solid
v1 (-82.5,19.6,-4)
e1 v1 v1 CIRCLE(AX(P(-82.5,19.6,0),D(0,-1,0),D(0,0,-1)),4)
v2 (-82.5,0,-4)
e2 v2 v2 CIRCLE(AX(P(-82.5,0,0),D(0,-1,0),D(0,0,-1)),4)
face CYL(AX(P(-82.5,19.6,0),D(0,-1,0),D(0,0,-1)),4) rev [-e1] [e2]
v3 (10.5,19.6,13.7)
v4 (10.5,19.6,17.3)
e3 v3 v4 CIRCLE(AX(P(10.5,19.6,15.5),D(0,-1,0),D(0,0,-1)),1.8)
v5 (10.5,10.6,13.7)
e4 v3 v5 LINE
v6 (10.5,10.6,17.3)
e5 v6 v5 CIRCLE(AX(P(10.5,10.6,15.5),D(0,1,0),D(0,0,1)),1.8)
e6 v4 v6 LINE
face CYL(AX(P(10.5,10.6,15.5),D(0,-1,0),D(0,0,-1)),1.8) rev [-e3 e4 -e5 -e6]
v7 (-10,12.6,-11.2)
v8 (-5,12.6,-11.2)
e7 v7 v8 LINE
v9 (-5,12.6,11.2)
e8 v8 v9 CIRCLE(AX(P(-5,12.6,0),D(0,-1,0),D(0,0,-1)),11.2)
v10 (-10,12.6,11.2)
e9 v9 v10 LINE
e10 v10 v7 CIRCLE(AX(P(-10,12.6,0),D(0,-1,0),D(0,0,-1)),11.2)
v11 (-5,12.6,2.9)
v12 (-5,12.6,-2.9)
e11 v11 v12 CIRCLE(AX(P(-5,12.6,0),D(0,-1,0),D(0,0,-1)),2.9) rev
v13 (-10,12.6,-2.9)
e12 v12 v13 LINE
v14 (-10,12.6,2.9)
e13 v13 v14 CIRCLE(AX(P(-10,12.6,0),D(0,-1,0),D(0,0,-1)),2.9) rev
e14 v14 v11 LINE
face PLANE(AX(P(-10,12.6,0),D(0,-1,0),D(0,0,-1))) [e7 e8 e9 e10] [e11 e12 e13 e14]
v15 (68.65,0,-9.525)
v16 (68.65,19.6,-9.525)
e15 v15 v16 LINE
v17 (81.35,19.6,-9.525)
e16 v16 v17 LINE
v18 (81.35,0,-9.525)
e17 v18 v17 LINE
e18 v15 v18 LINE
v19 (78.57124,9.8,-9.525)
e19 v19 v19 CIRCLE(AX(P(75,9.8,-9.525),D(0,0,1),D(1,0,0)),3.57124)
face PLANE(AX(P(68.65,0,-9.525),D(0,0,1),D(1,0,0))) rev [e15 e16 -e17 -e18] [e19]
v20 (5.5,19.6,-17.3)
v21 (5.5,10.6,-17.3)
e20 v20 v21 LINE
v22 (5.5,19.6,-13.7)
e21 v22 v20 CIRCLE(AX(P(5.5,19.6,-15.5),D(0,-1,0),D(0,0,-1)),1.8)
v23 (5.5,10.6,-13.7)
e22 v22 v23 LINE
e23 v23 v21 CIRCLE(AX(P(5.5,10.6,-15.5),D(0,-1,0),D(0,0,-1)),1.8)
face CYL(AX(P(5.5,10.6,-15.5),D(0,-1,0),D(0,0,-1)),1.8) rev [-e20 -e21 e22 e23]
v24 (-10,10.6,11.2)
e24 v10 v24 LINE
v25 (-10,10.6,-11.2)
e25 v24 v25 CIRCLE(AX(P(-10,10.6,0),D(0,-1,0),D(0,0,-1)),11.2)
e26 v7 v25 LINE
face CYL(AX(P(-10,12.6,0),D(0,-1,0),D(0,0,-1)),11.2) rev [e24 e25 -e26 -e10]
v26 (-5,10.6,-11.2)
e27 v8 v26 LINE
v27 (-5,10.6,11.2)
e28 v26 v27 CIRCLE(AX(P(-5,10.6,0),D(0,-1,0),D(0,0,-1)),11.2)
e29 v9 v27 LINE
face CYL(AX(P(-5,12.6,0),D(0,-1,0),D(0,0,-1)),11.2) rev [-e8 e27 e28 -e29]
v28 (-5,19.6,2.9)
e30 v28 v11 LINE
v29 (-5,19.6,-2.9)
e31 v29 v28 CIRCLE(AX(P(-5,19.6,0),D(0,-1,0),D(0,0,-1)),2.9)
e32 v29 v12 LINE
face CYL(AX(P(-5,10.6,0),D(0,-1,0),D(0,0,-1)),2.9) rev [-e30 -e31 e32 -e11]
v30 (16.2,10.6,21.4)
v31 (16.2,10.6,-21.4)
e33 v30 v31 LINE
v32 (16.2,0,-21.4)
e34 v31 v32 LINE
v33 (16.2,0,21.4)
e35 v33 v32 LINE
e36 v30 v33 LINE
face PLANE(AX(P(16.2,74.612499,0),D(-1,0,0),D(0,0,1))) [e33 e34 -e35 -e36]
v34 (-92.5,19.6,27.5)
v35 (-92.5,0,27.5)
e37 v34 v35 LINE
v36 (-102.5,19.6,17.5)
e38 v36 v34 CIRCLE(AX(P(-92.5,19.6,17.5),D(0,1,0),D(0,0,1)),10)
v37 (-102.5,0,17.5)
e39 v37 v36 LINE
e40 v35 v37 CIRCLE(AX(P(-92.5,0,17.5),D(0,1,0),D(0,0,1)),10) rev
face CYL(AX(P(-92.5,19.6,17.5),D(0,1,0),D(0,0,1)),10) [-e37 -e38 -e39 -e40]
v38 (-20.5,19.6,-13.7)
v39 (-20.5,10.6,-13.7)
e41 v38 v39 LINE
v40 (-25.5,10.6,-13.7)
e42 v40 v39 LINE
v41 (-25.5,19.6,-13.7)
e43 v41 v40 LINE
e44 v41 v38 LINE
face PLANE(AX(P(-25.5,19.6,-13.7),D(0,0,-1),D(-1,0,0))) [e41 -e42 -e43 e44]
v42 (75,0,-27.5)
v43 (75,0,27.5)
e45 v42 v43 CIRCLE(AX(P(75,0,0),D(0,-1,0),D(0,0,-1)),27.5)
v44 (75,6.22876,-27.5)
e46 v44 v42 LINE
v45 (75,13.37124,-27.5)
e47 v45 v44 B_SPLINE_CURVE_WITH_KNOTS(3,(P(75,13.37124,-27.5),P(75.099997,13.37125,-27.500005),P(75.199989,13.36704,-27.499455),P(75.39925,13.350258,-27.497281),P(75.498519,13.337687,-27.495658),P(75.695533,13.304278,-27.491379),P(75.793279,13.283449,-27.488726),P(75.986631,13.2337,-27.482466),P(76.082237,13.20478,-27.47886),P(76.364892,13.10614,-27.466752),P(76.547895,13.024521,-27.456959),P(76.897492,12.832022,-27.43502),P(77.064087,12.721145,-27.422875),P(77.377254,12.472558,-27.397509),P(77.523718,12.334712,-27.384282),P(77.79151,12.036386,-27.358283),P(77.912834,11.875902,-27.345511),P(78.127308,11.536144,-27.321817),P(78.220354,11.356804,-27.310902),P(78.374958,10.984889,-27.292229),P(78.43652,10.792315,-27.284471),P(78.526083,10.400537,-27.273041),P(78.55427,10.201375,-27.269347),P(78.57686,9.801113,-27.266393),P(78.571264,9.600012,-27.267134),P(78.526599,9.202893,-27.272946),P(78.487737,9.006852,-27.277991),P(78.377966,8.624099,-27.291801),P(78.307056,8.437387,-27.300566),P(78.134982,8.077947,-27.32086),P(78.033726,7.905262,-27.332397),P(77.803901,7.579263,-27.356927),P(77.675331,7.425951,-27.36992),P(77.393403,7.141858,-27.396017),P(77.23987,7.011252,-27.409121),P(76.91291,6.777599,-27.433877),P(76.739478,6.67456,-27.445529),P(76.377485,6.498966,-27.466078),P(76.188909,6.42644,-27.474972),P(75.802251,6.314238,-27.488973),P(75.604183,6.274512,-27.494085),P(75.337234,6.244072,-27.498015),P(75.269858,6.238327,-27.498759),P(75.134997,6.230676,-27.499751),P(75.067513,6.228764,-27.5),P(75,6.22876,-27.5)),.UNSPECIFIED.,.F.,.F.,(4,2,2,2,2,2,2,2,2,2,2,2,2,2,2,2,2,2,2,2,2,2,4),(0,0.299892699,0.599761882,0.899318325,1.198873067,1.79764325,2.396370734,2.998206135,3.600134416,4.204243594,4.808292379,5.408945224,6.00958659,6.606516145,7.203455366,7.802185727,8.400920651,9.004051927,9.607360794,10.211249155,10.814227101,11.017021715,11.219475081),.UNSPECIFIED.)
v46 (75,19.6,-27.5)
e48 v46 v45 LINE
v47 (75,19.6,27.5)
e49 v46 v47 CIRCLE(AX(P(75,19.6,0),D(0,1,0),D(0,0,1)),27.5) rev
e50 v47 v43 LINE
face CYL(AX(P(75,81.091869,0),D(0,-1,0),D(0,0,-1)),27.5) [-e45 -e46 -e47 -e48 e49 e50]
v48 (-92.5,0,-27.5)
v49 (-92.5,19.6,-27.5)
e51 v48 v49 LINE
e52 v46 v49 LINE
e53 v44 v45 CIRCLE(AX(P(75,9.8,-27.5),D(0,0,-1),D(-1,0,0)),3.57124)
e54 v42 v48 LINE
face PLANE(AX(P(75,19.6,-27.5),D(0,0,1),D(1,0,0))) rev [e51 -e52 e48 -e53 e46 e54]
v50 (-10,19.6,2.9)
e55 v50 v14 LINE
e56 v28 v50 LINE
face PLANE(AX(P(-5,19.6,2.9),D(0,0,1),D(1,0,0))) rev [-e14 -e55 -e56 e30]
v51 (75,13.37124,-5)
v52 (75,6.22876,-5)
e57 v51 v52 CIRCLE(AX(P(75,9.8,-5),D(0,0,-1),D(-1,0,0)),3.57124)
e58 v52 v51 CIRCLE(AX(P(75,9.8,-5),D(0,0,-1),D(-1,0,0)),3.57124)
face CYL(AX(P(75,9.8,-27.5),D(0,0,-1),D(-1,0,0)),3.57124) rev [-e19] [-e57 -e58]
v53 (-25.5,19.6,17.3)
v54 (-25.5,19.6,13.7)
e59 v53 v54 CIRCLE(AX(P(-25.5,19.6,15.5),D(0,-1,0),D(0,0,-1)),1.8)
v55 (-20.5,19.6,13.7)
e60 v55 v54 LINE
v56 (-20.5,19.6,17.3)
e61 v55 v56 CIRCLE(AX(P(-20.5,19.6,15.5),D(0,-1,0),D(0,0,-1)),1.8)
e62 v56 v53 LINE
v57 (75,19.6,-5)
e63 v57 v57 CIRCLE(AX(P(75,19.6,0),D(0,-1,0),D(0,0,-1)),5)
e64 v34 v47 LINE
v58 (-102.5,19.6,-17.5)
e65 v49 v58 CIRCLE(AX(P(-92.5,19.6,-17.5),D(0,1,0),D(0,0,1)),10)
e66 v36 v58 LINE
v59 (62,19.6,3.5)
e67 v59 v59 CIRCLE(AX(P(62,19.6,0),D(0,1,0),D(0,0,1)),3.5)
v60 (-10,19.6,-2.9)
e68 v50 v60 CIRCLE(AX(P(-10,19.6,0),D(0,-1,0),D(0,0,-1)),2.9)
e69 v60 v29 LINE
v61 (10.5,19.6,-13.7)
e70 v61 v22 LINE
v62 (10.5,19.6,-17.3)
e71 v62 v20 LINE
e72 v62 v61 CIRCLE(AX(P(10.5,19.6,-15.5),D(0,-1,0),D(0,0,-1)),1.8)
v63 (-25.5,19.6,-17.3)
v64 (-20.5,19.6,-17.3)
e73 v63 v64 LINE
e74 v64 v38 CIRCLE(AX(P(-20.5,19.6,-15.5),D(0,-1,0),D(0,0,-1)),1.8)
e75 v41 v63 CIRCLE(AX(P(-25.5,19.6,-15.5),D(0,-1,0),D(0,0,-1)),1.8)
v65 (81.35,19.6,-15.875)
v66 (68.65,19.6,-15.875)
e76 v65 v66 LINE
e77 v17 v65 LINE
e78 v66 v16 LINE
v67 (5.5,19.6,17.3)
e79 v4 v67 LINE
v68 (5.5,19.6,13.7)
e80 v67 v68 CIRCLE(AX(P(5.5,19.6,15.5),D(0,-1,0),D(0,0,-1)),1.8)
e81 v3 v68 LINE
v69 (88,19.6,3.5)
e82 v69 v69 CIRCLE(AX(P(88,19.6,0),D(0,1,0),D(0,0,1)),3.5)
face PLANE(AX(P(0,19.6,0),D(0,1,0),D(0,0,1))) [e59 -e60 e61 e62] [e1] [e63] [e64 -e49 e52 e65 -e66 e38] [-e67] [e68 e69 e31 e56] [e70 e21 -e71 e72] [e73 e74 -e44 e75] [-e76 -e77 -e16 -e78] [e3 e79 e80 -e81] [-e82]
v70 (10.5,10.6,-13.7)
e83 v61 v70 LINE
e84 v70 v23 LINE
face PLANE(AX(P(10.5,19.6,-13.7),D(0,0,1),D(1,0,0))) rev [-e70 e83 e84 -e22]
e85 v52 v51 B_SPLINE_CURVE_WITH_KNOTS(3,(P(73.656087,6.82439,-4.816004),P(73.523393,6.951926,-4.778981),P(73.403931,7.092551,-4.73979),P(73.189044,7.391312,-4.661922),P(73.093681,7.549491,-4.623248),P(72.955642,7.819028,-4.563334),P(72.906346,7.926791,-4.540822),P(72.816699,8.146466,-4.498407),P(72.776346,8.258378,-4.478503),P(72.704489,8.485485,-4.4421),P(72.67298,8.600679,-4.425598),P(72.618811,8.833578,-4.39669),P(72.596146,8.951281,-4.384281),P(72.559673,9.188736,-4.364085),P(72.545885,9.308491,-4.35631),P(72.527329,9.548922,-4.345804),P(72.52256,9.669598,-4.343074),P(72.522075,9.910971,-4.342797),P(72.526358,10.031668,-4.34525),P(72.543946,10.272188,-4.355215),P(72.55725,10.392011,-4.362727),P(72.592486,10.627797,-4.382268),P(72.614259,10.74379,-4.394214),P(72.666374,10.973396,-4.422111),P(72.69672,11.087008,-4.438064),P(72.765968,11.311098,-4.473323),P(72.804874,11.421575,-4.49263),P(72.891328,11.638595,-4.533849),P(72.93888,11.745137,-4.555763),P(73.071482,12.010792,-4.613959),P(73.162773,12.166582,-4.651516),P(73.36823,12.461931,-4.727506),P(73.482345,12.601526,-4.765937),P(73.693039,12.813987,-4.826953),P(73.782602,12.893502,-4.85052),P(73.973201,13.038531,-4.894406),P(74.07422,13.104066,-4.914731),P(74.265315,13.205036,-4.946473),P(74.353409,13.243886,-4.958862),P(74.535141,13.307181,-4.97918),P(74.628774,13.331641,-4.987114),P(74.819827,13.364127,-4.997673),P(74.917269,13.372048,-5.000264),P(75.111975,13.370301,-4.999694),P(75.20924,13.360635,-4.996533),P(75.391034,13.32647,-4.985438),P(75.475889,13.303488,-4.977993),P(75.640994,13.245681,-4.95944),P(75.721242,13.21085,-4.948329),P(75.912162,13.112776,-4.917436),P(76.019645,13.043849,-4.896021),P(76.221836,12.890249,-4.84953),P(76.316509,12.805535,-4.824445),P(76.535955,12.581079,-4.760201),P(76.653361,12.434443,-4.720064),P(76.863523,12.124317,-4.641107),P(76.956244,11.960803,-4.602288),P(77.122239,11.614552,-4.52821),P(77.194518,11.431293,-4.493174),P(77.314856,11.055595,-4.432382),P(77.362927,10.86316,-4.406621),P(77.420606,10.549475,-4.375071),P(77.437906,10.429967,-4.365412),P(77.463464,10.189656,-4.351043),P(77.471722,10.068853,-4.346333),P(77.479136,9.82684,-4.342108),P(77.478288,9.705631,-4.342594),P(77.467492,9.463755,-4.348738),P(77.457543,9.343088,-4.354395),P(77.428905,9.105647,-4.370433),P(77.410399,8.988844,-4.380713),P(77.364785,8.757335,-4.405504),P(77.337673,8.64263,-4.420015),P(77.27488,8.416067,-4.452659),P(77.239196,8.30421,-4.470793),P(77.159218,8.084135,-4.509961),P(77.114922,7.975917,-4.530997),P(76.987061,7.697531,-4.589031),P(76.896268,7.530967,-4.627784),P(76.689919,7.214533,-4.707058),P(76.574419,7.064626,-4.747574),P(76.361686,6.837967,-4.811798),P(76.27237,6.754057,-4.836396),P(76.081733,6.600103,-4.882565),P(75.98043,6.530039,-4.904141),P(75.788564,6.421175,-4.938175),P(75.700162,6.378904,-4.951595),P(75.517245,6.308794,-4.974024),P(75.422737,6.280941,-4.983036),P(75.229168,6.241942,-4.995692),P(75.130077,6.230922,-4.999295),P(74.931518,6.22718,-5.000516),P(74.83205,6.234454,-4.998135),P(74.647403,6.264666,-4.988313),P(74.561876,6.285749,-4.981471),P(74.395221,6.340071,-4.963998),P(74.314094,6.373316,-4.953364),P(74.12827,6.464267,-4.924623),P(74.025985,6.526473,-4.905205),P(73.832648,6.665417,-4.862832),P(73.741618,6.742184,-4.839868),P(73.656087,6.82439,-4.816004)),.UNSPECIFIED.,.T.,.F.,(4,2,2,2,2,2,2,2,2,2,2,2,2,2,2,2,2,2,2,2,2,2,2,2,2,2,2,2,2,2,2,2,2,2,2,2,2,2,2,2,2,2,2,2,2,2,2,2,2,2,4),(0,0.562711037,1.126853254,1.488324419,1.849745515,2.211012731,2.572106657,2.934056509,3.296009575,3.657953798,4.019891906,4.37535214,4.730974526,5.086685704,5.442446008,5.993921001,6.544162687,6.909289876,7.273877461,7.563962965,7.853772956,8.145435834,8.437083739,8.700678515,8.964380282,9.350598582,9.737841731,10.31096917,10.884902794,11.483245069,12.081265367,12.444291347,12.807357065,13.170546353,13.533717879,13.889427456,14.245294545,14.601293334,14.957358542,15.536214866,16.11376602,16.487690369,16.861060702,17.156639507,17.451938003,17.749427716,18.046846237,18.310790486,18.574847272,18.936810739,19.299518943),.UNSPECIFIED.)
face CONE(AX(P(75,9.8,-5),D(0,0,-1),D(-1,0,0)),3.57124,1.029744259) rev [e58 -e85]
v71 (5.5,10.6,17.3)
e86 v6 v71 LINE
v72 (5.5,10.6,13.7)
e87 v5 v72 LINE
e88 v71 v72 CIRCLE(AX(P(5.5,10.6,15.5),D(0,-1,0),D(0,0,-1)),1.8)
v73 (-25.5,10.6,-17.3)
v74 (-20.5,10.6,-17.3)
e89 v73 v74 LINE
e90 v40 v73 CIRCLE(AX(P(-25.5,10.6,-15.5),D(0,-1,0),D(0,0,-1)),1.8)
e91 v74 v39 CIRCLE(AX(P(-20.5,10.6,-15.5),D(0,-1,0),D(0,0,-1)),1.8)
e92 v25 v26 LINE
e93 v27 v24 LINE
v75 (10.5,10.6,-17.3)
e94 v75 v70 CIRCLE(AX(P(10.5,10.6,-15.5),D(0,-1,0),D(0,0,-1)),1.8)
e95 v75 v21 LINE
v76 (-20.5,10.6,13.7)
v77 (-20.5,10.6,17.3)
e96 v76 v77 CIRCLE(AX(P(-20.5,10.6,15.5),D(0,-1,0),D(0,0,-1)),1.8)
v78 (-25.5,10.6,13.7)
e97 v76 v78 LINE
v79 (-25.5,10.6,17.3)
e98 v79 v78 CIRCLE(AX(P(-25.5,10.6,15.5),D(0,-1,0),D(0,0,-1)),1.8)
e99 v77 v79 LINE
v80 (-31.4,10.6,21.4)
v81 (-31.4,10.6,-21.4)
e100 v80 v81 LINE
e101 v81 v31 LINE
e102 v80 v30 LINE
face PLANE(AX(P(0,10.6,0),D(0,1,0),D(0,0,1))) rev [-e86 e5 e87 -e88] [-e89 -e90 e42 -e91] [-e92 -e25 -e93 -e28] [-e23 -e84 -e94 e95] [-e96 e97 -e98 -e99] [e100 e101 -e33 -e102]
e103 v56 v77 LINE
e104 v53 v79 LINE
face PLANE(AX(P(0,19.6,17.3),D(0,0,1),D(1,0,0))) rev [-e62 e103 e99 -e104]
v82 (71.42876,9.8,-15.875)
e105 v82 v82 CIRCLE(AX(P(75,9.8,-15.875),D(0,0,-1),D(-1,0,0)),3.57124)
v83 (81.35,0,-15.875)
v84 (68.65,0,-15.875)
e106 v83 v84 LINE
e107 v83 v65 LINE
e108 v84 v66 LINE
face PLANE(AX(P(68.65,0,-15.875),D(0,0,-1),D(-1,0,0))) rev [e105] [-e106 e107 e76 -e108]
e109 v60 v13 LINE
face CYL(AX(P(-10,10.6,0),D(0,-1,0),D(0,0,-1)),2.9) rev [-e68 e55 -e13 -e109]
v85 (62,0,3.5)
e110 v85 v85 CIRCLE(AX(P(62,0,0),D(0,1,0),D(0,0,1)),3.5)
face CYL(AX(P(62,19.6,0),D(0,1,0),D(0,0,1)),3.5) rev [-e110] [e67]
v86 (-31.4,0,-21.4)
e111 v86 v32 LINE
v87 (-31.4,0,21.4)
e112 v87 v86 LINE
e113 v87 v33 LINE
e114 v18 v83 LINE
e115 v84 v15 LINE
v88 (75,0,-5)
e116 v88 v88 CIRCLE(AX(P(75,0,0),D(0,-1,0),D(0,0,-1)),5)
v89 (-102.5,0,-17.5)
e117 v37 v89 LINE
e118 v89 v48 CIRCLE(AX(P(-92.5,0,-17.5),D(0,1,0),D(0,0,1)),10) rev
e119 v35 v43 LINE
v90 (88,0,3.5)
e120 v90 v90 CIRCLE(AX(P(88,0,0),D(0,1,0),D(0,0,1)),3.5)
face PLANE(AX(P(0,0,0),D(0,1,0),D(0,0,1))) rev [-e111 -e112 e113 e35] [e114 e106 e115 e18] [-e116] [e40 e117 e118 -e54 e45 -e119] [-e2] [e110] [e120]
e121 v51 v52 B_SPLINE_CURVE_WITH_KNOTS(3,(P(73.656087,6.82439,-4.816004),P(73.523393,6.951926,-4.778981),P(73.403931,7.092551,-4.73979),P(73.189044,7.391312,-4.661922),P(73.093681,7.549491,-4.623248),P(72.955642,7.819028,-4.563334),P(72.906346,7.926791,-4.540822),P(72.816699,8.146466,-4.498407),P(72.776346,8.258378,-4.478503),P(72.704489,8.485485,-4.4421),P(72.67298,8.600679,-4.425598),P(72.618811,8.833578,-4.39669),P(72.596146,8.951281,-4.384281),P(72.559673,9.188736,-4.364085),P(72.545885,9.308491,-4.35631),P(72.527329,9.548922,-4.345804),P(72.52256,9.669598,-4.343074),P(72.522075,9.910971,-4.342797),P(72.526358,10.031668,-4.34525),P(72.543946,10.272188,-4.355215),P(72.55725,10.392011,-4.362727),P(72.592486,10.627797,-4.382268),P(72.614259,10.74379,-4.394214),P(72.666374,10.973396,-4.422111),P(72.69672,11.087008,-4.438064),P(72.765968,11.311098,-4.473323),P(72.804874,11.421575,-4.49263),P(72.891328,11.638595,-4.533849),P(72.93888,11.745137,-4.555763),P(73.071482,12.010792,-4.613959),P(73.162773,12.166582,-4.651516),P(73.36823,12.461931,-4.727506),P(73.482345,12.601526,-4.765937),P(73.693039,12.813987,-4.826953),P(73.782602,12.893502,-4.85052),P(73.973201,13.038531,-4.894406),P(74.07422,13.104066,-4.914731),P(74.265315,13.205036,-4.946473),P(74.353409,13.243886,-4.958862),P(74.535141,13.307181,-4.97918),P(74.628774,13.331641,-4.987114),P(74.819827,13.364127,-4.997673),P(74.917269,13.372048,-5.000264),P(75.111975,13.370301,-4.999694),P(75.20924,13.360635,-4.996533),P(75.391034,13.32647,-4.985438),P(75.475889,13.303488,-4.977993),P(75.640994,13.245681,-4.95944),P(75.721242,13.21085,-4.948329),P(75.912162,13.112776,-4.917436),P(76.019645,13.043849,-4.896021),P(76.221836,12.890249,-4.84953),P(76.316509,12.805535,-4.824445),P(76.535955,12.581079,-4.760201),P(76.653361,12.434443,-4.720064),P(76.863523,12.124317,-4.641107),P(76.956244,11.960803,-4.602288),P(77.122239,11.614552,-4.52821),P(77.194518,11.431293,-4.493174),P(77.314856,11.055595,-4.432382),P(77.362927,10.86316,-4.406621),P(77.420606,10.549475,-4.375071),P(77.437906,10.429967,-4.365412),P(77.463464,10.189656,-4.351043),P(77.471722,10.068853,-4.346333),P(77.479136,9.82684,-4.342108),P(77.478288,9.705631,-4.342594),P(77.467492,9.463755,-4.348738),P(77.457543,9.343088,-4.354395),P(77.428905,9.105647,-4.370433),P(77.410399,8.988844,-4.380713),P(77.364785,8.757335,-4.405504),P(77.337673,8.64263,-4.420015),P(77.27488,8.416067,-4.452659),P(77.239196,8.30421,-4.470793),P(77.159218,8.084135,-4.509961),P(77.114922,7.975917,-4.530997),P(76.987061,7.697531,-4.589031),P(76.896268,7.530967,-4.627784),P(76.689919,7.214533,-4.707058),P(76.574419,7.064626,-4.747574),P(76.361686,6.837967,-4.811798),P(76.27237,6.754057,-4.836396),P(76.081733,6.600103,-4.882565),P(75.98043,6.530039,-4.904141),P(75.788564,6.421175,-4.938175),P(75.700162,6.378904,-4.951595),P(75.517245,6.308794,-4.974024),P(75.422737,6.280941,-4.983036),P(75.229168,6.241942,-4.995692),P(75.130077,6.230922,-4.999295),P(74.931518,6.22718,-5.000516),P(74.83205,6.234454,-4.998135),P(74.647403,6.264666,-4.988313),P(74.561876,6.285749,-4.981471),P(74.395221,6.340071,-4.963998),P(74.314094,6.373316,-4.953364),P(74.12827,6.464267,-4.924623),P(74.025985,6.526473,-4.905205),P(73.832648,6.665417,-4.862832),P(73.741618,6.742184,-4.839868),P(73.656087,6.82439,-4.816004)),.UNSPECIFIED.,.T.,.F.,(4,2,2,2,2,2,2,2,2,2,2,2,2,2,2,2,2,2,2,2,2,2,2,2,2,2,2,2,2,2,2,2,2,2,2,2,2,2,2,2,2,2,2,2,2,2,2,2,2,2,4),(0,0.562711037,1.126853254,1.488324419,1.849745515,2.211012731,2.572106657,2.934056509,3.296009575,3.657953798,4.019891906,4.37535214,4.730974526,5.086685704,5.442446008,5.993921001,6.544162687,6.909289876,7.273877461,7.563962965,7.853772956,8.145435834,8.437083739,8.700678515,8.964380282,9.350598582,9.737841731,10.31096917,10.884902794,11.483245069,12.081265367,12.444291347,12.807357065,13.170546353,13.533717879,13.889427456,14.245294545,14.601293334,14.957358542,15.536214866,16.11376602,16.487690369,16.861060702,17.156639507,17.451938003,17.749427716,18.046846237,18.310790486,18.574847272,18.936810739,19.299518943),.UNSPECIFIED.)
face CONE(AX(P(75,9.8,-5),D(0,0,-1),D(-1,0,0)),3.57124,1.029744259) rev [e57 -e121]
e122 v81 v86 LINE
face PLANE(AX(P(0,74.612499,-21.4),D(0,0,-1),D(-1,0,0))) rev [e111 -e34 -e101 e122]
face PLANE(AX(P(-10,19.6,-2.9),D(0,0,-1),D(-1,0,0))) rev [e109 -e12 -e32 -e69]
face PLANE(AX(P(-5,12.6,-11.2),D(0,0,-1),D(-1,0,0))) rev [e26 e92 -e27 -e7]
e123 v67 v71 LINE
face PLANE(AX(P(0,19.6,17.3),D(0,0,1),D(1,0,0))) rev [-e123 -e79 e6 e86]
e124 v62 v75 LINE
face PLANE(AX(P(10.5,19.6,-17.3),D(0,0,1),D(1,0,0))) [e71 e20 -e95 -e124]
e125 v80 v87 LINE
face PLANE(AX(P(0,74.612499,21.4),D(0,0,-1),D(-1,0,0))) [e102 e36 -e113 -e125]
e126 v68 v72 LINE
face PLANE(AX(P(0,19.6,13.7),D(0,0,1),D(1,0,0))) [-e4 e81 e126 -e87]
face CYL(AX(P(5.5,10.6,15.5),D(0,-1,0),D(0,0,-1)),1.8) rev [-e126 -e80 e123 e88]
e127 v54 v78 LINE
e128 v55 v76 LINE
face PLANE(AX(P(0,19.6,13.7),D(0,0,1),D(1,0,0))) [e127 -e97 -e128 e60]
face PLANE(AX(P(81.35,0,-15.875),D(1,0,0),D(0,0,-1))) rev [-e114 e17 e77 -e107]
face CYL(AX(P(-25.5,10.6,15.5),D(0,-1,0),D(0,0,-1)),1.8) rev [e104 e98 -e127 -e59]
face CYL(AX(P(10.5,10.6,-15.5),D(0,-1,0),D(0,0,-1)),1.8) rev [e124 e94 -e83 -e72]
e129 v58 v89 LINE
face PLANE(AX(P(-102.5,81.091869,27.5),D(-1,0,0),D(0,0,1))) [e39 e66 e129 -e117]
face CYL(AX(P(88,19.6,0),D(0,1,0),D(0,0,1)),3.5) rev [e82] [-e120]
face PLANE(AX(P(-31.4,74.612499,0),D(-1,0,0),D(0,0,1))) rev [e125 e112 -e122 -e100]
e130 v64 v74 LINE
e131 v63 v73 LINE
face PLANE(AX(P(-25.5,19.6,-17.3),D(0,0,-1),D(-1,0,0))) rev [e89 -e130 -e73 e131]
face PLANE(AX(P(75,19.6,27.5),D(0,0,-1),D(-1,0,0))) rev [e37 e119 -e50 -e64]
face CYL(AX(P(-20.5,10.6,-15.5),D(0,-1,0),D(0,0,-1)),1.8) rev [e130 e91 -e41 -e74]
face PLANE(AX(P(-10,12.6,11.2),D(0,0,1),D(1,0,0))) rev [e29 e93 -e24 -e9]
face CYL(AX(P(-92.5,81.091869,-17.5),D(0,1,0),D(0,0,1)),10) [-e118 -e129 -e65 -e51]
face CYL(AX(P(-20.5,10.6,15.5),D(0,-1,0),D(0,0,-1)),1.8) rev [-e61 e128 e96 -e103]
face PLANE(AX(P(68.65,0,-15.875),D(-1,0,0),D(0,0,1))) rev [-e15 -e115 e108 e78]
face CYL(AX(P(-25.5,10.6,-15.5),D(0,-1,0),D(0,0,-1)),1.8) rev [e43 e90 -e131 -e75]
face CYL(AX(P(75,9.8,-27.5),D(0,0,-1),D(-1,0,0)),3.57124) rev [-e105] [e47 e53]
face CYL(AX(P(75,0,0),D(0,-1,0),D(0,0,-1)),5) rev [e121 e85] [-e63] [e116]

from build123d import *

# Parameters (mm, degrees)
SKETCH1_W                       = 150
SKETCH1_H                       = 55
BOSS_EXTRUDE1_DEPTH             = 19.6
SKETCH2_W                       = 27.5
SKETCH2_H                       = 55
BOSS_EXTRUDE2_DEPTH             = 19.6
M8_CLEARANCE_HOLE1_D            = 10
M6_CLEARANCE_HOLE1_D            = 7
FILLET1_R                       = 10
SKETCH11_W                      = 42.4
SKETCH11_H                      = 42.4
CUT_EXTRUDE1_DEPTH              = 10.6
SKETCH13_W                      = 1.8
SKETCH13_H                      = 9
M3_CLEARANCE_HOLE1_AT_2_COUNT   = 2
M3_CLEARANCE_HOLE1_AT_2_PITCH   = 31
M3_CLEARANCE_HOLE1_AT_3_COUNT   = 2
M3_CLEARANCE_HOLE1_AT_3_PITCH   = 43.840620434
M3_CLEARANCE_HOLE1_AT_4_COUNT   = 2
M3_CLEARANCE_HOLE1_AT_4_PITCH   = 31
M3_CLEARANCE_HOLE1_AT_5_COUNT   = 2
M3_CLEARANCE_HOLE1_AT_5_PITCH   = 21.920310217
M3_CLEARANCE_HOLE1_AT_6_COUNT   = 2
M3_CLEARANCE_HOLE1_AT_6_PITCH   = 5
M3_CLEARANCE_HOLE1_AT_7_COUNT   = 2
M3_CLEARANCE_HOLE1_AT_7_PITCH   = 31.400636936
M3_CLEARANCE_HOLE1_AT_8_COUNT   = 2
M3_CLEARANCE_HOLE1_AT_8_PITCH   = 40.459856648
M3_CLEARANCE_HOLE1_AT_9_COUNT   = 2
M3_CLEARANCE_HOLE1_AT_9_PITCH   = 26
M5_CLEARANCE_HOLE1_D            = 5.8
SKETCH17_R                      = 4
CUT_EXTRUDE2_DEPTH              = 108.919692364
SKETCH18_W                      = 0.2
SKETCH18_H                      = 42.4
SKETCH18_W_2                    = 5
SKETCH18_H_2                    = 0.2
CUT_EXTRUDE3_DEPTH              = 10.6
SKETCH19_W                      = 5
SKETCH19_H                      = 5.8
SKETCH19_H_2                    = 3.6
CUT_EXTRUDE4_DEPTH              = 107.652988706
CUT_EXTRUDE5_DEPTH              = 2
SKETCH21_W                      = 12.7
SKETCH21_H                      = 6.35
CUT_EXTRUDE6_DEPTH              = 108.919692364
F_1_4_CLEARANCE_HOLE1_OUTLINE_W = 3.57124
F_1_4_CLEARANCE_HOLE1_OUTLINE_H = 11.625002241


# Read off the part's stored shape, not the designer's step: 1/4 Clearance Hole1
with BuildPart() as part:
    # Sketch1 → Boss-Extrude1 (new body)
    with BuildSketch(Plane(origin=(0, 0, 0), x_dir=(1, 0, 0), z_dir=(0, 1, 0))):
        Rectangle(SKETCH1_W, SKETCH1_H)
    extrude(amount=BOSS_EXTRUDE1_DEPTH)

    # Sketch2 → Boss-Extrude2 (add)
    with BuildSketch(Plane.XZ):
        with Locations((-88.75, 0)):
            Rectangle(SKETCH2_W, SKETCH2_H)
        with BuildLine():
            Line((75, 27.5), (75, -27.5))
            ThreePointArc((75, -27.5), (102.5, 0), (75, 27.5))
        make_face()
    extrude(amount=-BOSS_EXTRUDE2_DEPTH)

    # M8 Clearance Hole1 (through all)
    with Locations(Plane(origin=(0, 0, 0), x_dir=(-1, 0, 0), z_dir=(0, -1, 0))):
        with Locations((-75, 0)):
            Hole(M8_CLEARANCE_HOLE1_D / 2)

    # M6 Clearance Hole1 (through all)
    with Locations(Plane(origin=(0, 19.6, 0), x_dir=(1, 0, 0), z_dir=(0, 1, 0))):
        with Locations((62, 0), (88, 0)):
            Hole(M6_CLEARANCE_HOLE1_D / 2)

    # Fillet1
    fillet1_edges = [part.edges().sort_by_distance(p)[0] for p in [
        (-102.5, 9.8, -27.5),
        (-102.5, 9.8, 27.5),
    ]]
    fillet(fillet1_edges, radius=FILLET1_R)

    # Sketch11 → Cut-Extrude1 (cut)
    with BuildSketch(Plane.XZ):
        with Locations((-10, 0)):
            Rectangle(SKETCH11_W, SKETCH11_H)
    extrude(amount=-CUT_EXTRUDE1_DEPTH, mode=Mode.SUBTRACT)

    # Sketch13 → M3 Clearance Hole1 (revolve, cut)
    with BuildSketch(Plane(origin=(5.5, 10.6, -15.5), x_dir=(0, 0, -1), z_dir=(1, 0, 0))):
        with Locations((0.9, 4.5)):
            Rectangle(SKETCH13_W, SKETCH13_H)
    m3_clearance_hole1 = revolve(axis=Axis((5.5, 4.25, -15.5), (0, 1, 0)), mode=Mode.SUBTRACT)

    # M3 Clearance Hole1 at 2: M3 Clearance Hole1 ×2
    with Locations(*[(-i * M3_CLEARANCE_HOLE1_AT_2_PITCH, 0, 0) for i in range(1, M3_CLEARANCE_HOLE1_AT_2_COUNT)]):
        add(m3_clearance_hole1, mode=Mode.SUBTRACT)

    # M3 Clearance Hole1 at 3: M3 Clearance Hole1 ×2
    with Locations(*[Vector(-0.7071067811865476, 0, 0.7071067811865476) * (i * M3_CLEARANCE_HOLE1_AT_3_PITCH) for i in range(1, M3_CLEARANCE_HOLE1_AT_3_COUNT)]):
        add(m3_clearance_hole1, mode=Mode.SUBTRACT)

    # M3 Clearance Hole1 at 4: M3 Clearance Hole1 ×2
    with Locations(*[(0, 0, i * M3_CLEARANCE_HOLE1_AT_4_PITCH) for i in range(1, M3_CLEARANCE_HOLE1_AT_4_COUNT)]):
        add(m3_clearance_hole1, mode=Mode.SUBTRACT)

    # M3 Clearance Hole1 at 5: M3 Clearance Hole1 ×2
    with Locations(*[Vector(-0.7071067811865476, 0, 0.7071067811865476) * (i * M3_CLEARANCE_HOLE1_AT_5_PITCH) for i in range(1, M3_CLEARANCE_HOLE1_AT_5_COUNT)]):
        add(m3_clearance_hole1, mode=Mode.SUBTRACT)

    # M3 Clearance Hole1 at 6: M3 Clearance Hole1 ×2
    with Locations(*[(i * M3_CLEARANCE_HOLE1_AT_6_PITCH, 0, 0) for i in range(1, M3_CLEARANCE_HOLE1_AT_6_COUNT)]):
        add(m3_clearance_hole1, mode=Mode.SUBTRACT)

    # M3 Clearance Hole1 at 7: M3 Clearance Hole1 ×2
    with Locations(*[Vector(0.15923243882462054, 0, 0.9872411207126471) * (i * M3_CLEARANCE_HOLE1_AT_7_PITCH) for i in range(1, M3_CLEARANCE_HOLE1_AT_7_COUNT)]):
        add(m3_clearance_hole1, mode=Mode.SUBTRACT)

    # M3 Clearance Hole1 at 8: M3 Clearance Hole1 ×2
    with Locations(*[Vector(-0.6426122619764711, 0, 0.7661915431257925) * (i * M3_CLEARANCE_HOLE1_AT_8_PITCH) for i in range(1, M3_CLEARANCE_HOLE1_AT_8_COUNT)]):
        add(m3_clearance_hole1, mode=Mode.SUBTRACT)

    # M3 Clearance Hole1 at 9: M3 Clearance Hole1 ×2
    with Locations(*[(-i * M3_CLEARANCE_HOLE1_AT_9_PITCH, 0, 0) for i in range(1, M3_CLEARANCE_HOLE1_AT_9_COUNT)]):
        add(m3_clearance_hole1, mode=Mode.SUBTRACT)

    # M5 Clearance Hole1 (through all)
    with Locations(Plane(origin=(0, 10.6, 0), x_dir=(-1, 0, 0), z_dir=(0, -1, 0))):
        with Locations((10, 0), (5, 0)):
            Hole(M5_CLEARANCE_HOLE1_D / 2)

    # Sketch17 → Cut-Extrude2 (cut, through all)
    with BuildSketch(Plane.XZ):
        with Locations(Location((-82.5, 0, 0), (0, 0, 270))):
            Circle(SKETCH17_R)
    extrude(amount=-CUT_EXTRUDE2_DEPTH, mode=Mode.SUBTRACT)

    # Sketch18 → Cut-Extrude3 (cut)
    with BuildSketch(Plane.XZ):
        with Locations((-31.3, 0)):
            Rectangle(SKETCH18_W, SKETCH18_H)
        Polygon((11.2, -21.2), (-31.2, -21.2), (-31.4, -21.2), (-31.4, -21.4), (11.2, -21.4), align=None)
        with Locations((13.7, -21.3)):
            Rectangle(SKETCH18_W_2, SKETCH18_H_2)
        Polygon((11.2, 21.4), (11.2, 21.2), (11.2, -21.2), (16.2, -21.2), (16.2, 21.4), align=None)
        Polygon((-31.4, 21.2), (-31.2, 21.2), (11.2, 21.2), (11.2, 21.4), (-31.4, 21.4), align=None)
    extrude(amount=-CUT_EXTRUDE3_DEPTH, mode=Mode.SUBTRACT)

    # Sketch19 → Cut-Extrude4 (cut, through all)
    with BuildSketch(Plane.XZ.offset(-10.6)):
        with BuildLine():
            ThreePointArc((-20.5, 13.7), (-22.3, 15.5), (-20.5, 17.3))
            Line((-20.5, 17.3), (-25.5, 17.3))
            ThreePointArc((-25.5, 17.3), (-24.227207794, 16.772792206), (-23.7, 15.5))
            ThreePointArc((-23.7, 15.5), (-24.227207794, 14.227207794), (-25.5, 13.7))
            Line((-25.5, 13.7), (-20.5, 13.7))
        make_face()
        with BuildLine():
            ThreePointArc((10.5, 13.7), (8.7, 15.5), (10.5, 17.3))
            Line((10.5, 17.3), (5.5, 17.3))
            ThreePointArc((5.5, 17.3), (6.772792206, 16.772792206), (7.3, 15.5))
            ThreePointArc((7.3, 15.5), (6.772792206, 14.227207794), (5.5, 13.7))
            Line((5.5, 13.7), (10.5, 13.7))
        make_face()
        with Locations((-7.5, 0)):
            Rectangle(SKETCH19_W, SKETCH19_H)
        with Locations((8, -15.5)):
            Rectangle(SKETCH19_W, SKETCH19_H_2)
        with Locations((-23, -15.5)):
            Rectangle(SKETCH19_W, SKETCH19_H_2)
    extrude(amount=-CUT_EXTRUDE4_DEPTH, mode=Mode.SUBTRACT)

    # Sketch16 → Cut-Extrude5 (cut)
    with BuildSketch(Plane.XZ.offset(-10.6)):
        with BuildLine():
            Line((-10, 11.2), (-5, 11.2))
            ThreePointArc((-5, 11.2), (6.2, 0), (-5, -11.2))
            Line((-5, -11.2), (-10, -11.2))
            ThreePointArc((-10, -11.2), (-21.2, 0), (-10, 11.2))
        make_face()
    extrude(amount=-CUT_EXTRUDE5_DEPTH, mode=Mode.SUBTRACT)

    # Sketch21 → Cut-Extrude6 (cut, through all)
    with BuildSketch(Plane(origin=(0, 19.6, 0), x_dir=(1, 0, 0), z_dir=(0, 1, 0))):
        with Locations((75, 12.7)):
            Rectangle(SKETCH21_W, SKETCH21_H)
    extrude(amount=-CUT_EXTRUDE6_DEPTH, mode=Mode.SUBTRACT)

    # 1/4 Clearance Hole1 outline → 1/4 Clearance Hole1 (revolve, cut)
    with BuildSketch(Plane(origin=(75, 9.8, 0), x_dir=(1, 0, 0), z_dir=(0, -1, 0))):
        Polygon((2.477440343, -4.342778861), (0, -4.342778861), (0, -9.525), (3.57124, -9.525), (3.571240952, -5.000000572), align=None)
        with Locations((1.78562, -21.687501121)):
            Rectangle(F_1_4_CLEARANCE_HOLE1_OUTLINE_W, F_1_4_CLEARANCE_HOLE1_OUTLINE_H)
    revolve(axis=Axis((75, 9.8, 0), (0, 0, 1)), mode=Mode.SUBTRACT)


solid = part.part
